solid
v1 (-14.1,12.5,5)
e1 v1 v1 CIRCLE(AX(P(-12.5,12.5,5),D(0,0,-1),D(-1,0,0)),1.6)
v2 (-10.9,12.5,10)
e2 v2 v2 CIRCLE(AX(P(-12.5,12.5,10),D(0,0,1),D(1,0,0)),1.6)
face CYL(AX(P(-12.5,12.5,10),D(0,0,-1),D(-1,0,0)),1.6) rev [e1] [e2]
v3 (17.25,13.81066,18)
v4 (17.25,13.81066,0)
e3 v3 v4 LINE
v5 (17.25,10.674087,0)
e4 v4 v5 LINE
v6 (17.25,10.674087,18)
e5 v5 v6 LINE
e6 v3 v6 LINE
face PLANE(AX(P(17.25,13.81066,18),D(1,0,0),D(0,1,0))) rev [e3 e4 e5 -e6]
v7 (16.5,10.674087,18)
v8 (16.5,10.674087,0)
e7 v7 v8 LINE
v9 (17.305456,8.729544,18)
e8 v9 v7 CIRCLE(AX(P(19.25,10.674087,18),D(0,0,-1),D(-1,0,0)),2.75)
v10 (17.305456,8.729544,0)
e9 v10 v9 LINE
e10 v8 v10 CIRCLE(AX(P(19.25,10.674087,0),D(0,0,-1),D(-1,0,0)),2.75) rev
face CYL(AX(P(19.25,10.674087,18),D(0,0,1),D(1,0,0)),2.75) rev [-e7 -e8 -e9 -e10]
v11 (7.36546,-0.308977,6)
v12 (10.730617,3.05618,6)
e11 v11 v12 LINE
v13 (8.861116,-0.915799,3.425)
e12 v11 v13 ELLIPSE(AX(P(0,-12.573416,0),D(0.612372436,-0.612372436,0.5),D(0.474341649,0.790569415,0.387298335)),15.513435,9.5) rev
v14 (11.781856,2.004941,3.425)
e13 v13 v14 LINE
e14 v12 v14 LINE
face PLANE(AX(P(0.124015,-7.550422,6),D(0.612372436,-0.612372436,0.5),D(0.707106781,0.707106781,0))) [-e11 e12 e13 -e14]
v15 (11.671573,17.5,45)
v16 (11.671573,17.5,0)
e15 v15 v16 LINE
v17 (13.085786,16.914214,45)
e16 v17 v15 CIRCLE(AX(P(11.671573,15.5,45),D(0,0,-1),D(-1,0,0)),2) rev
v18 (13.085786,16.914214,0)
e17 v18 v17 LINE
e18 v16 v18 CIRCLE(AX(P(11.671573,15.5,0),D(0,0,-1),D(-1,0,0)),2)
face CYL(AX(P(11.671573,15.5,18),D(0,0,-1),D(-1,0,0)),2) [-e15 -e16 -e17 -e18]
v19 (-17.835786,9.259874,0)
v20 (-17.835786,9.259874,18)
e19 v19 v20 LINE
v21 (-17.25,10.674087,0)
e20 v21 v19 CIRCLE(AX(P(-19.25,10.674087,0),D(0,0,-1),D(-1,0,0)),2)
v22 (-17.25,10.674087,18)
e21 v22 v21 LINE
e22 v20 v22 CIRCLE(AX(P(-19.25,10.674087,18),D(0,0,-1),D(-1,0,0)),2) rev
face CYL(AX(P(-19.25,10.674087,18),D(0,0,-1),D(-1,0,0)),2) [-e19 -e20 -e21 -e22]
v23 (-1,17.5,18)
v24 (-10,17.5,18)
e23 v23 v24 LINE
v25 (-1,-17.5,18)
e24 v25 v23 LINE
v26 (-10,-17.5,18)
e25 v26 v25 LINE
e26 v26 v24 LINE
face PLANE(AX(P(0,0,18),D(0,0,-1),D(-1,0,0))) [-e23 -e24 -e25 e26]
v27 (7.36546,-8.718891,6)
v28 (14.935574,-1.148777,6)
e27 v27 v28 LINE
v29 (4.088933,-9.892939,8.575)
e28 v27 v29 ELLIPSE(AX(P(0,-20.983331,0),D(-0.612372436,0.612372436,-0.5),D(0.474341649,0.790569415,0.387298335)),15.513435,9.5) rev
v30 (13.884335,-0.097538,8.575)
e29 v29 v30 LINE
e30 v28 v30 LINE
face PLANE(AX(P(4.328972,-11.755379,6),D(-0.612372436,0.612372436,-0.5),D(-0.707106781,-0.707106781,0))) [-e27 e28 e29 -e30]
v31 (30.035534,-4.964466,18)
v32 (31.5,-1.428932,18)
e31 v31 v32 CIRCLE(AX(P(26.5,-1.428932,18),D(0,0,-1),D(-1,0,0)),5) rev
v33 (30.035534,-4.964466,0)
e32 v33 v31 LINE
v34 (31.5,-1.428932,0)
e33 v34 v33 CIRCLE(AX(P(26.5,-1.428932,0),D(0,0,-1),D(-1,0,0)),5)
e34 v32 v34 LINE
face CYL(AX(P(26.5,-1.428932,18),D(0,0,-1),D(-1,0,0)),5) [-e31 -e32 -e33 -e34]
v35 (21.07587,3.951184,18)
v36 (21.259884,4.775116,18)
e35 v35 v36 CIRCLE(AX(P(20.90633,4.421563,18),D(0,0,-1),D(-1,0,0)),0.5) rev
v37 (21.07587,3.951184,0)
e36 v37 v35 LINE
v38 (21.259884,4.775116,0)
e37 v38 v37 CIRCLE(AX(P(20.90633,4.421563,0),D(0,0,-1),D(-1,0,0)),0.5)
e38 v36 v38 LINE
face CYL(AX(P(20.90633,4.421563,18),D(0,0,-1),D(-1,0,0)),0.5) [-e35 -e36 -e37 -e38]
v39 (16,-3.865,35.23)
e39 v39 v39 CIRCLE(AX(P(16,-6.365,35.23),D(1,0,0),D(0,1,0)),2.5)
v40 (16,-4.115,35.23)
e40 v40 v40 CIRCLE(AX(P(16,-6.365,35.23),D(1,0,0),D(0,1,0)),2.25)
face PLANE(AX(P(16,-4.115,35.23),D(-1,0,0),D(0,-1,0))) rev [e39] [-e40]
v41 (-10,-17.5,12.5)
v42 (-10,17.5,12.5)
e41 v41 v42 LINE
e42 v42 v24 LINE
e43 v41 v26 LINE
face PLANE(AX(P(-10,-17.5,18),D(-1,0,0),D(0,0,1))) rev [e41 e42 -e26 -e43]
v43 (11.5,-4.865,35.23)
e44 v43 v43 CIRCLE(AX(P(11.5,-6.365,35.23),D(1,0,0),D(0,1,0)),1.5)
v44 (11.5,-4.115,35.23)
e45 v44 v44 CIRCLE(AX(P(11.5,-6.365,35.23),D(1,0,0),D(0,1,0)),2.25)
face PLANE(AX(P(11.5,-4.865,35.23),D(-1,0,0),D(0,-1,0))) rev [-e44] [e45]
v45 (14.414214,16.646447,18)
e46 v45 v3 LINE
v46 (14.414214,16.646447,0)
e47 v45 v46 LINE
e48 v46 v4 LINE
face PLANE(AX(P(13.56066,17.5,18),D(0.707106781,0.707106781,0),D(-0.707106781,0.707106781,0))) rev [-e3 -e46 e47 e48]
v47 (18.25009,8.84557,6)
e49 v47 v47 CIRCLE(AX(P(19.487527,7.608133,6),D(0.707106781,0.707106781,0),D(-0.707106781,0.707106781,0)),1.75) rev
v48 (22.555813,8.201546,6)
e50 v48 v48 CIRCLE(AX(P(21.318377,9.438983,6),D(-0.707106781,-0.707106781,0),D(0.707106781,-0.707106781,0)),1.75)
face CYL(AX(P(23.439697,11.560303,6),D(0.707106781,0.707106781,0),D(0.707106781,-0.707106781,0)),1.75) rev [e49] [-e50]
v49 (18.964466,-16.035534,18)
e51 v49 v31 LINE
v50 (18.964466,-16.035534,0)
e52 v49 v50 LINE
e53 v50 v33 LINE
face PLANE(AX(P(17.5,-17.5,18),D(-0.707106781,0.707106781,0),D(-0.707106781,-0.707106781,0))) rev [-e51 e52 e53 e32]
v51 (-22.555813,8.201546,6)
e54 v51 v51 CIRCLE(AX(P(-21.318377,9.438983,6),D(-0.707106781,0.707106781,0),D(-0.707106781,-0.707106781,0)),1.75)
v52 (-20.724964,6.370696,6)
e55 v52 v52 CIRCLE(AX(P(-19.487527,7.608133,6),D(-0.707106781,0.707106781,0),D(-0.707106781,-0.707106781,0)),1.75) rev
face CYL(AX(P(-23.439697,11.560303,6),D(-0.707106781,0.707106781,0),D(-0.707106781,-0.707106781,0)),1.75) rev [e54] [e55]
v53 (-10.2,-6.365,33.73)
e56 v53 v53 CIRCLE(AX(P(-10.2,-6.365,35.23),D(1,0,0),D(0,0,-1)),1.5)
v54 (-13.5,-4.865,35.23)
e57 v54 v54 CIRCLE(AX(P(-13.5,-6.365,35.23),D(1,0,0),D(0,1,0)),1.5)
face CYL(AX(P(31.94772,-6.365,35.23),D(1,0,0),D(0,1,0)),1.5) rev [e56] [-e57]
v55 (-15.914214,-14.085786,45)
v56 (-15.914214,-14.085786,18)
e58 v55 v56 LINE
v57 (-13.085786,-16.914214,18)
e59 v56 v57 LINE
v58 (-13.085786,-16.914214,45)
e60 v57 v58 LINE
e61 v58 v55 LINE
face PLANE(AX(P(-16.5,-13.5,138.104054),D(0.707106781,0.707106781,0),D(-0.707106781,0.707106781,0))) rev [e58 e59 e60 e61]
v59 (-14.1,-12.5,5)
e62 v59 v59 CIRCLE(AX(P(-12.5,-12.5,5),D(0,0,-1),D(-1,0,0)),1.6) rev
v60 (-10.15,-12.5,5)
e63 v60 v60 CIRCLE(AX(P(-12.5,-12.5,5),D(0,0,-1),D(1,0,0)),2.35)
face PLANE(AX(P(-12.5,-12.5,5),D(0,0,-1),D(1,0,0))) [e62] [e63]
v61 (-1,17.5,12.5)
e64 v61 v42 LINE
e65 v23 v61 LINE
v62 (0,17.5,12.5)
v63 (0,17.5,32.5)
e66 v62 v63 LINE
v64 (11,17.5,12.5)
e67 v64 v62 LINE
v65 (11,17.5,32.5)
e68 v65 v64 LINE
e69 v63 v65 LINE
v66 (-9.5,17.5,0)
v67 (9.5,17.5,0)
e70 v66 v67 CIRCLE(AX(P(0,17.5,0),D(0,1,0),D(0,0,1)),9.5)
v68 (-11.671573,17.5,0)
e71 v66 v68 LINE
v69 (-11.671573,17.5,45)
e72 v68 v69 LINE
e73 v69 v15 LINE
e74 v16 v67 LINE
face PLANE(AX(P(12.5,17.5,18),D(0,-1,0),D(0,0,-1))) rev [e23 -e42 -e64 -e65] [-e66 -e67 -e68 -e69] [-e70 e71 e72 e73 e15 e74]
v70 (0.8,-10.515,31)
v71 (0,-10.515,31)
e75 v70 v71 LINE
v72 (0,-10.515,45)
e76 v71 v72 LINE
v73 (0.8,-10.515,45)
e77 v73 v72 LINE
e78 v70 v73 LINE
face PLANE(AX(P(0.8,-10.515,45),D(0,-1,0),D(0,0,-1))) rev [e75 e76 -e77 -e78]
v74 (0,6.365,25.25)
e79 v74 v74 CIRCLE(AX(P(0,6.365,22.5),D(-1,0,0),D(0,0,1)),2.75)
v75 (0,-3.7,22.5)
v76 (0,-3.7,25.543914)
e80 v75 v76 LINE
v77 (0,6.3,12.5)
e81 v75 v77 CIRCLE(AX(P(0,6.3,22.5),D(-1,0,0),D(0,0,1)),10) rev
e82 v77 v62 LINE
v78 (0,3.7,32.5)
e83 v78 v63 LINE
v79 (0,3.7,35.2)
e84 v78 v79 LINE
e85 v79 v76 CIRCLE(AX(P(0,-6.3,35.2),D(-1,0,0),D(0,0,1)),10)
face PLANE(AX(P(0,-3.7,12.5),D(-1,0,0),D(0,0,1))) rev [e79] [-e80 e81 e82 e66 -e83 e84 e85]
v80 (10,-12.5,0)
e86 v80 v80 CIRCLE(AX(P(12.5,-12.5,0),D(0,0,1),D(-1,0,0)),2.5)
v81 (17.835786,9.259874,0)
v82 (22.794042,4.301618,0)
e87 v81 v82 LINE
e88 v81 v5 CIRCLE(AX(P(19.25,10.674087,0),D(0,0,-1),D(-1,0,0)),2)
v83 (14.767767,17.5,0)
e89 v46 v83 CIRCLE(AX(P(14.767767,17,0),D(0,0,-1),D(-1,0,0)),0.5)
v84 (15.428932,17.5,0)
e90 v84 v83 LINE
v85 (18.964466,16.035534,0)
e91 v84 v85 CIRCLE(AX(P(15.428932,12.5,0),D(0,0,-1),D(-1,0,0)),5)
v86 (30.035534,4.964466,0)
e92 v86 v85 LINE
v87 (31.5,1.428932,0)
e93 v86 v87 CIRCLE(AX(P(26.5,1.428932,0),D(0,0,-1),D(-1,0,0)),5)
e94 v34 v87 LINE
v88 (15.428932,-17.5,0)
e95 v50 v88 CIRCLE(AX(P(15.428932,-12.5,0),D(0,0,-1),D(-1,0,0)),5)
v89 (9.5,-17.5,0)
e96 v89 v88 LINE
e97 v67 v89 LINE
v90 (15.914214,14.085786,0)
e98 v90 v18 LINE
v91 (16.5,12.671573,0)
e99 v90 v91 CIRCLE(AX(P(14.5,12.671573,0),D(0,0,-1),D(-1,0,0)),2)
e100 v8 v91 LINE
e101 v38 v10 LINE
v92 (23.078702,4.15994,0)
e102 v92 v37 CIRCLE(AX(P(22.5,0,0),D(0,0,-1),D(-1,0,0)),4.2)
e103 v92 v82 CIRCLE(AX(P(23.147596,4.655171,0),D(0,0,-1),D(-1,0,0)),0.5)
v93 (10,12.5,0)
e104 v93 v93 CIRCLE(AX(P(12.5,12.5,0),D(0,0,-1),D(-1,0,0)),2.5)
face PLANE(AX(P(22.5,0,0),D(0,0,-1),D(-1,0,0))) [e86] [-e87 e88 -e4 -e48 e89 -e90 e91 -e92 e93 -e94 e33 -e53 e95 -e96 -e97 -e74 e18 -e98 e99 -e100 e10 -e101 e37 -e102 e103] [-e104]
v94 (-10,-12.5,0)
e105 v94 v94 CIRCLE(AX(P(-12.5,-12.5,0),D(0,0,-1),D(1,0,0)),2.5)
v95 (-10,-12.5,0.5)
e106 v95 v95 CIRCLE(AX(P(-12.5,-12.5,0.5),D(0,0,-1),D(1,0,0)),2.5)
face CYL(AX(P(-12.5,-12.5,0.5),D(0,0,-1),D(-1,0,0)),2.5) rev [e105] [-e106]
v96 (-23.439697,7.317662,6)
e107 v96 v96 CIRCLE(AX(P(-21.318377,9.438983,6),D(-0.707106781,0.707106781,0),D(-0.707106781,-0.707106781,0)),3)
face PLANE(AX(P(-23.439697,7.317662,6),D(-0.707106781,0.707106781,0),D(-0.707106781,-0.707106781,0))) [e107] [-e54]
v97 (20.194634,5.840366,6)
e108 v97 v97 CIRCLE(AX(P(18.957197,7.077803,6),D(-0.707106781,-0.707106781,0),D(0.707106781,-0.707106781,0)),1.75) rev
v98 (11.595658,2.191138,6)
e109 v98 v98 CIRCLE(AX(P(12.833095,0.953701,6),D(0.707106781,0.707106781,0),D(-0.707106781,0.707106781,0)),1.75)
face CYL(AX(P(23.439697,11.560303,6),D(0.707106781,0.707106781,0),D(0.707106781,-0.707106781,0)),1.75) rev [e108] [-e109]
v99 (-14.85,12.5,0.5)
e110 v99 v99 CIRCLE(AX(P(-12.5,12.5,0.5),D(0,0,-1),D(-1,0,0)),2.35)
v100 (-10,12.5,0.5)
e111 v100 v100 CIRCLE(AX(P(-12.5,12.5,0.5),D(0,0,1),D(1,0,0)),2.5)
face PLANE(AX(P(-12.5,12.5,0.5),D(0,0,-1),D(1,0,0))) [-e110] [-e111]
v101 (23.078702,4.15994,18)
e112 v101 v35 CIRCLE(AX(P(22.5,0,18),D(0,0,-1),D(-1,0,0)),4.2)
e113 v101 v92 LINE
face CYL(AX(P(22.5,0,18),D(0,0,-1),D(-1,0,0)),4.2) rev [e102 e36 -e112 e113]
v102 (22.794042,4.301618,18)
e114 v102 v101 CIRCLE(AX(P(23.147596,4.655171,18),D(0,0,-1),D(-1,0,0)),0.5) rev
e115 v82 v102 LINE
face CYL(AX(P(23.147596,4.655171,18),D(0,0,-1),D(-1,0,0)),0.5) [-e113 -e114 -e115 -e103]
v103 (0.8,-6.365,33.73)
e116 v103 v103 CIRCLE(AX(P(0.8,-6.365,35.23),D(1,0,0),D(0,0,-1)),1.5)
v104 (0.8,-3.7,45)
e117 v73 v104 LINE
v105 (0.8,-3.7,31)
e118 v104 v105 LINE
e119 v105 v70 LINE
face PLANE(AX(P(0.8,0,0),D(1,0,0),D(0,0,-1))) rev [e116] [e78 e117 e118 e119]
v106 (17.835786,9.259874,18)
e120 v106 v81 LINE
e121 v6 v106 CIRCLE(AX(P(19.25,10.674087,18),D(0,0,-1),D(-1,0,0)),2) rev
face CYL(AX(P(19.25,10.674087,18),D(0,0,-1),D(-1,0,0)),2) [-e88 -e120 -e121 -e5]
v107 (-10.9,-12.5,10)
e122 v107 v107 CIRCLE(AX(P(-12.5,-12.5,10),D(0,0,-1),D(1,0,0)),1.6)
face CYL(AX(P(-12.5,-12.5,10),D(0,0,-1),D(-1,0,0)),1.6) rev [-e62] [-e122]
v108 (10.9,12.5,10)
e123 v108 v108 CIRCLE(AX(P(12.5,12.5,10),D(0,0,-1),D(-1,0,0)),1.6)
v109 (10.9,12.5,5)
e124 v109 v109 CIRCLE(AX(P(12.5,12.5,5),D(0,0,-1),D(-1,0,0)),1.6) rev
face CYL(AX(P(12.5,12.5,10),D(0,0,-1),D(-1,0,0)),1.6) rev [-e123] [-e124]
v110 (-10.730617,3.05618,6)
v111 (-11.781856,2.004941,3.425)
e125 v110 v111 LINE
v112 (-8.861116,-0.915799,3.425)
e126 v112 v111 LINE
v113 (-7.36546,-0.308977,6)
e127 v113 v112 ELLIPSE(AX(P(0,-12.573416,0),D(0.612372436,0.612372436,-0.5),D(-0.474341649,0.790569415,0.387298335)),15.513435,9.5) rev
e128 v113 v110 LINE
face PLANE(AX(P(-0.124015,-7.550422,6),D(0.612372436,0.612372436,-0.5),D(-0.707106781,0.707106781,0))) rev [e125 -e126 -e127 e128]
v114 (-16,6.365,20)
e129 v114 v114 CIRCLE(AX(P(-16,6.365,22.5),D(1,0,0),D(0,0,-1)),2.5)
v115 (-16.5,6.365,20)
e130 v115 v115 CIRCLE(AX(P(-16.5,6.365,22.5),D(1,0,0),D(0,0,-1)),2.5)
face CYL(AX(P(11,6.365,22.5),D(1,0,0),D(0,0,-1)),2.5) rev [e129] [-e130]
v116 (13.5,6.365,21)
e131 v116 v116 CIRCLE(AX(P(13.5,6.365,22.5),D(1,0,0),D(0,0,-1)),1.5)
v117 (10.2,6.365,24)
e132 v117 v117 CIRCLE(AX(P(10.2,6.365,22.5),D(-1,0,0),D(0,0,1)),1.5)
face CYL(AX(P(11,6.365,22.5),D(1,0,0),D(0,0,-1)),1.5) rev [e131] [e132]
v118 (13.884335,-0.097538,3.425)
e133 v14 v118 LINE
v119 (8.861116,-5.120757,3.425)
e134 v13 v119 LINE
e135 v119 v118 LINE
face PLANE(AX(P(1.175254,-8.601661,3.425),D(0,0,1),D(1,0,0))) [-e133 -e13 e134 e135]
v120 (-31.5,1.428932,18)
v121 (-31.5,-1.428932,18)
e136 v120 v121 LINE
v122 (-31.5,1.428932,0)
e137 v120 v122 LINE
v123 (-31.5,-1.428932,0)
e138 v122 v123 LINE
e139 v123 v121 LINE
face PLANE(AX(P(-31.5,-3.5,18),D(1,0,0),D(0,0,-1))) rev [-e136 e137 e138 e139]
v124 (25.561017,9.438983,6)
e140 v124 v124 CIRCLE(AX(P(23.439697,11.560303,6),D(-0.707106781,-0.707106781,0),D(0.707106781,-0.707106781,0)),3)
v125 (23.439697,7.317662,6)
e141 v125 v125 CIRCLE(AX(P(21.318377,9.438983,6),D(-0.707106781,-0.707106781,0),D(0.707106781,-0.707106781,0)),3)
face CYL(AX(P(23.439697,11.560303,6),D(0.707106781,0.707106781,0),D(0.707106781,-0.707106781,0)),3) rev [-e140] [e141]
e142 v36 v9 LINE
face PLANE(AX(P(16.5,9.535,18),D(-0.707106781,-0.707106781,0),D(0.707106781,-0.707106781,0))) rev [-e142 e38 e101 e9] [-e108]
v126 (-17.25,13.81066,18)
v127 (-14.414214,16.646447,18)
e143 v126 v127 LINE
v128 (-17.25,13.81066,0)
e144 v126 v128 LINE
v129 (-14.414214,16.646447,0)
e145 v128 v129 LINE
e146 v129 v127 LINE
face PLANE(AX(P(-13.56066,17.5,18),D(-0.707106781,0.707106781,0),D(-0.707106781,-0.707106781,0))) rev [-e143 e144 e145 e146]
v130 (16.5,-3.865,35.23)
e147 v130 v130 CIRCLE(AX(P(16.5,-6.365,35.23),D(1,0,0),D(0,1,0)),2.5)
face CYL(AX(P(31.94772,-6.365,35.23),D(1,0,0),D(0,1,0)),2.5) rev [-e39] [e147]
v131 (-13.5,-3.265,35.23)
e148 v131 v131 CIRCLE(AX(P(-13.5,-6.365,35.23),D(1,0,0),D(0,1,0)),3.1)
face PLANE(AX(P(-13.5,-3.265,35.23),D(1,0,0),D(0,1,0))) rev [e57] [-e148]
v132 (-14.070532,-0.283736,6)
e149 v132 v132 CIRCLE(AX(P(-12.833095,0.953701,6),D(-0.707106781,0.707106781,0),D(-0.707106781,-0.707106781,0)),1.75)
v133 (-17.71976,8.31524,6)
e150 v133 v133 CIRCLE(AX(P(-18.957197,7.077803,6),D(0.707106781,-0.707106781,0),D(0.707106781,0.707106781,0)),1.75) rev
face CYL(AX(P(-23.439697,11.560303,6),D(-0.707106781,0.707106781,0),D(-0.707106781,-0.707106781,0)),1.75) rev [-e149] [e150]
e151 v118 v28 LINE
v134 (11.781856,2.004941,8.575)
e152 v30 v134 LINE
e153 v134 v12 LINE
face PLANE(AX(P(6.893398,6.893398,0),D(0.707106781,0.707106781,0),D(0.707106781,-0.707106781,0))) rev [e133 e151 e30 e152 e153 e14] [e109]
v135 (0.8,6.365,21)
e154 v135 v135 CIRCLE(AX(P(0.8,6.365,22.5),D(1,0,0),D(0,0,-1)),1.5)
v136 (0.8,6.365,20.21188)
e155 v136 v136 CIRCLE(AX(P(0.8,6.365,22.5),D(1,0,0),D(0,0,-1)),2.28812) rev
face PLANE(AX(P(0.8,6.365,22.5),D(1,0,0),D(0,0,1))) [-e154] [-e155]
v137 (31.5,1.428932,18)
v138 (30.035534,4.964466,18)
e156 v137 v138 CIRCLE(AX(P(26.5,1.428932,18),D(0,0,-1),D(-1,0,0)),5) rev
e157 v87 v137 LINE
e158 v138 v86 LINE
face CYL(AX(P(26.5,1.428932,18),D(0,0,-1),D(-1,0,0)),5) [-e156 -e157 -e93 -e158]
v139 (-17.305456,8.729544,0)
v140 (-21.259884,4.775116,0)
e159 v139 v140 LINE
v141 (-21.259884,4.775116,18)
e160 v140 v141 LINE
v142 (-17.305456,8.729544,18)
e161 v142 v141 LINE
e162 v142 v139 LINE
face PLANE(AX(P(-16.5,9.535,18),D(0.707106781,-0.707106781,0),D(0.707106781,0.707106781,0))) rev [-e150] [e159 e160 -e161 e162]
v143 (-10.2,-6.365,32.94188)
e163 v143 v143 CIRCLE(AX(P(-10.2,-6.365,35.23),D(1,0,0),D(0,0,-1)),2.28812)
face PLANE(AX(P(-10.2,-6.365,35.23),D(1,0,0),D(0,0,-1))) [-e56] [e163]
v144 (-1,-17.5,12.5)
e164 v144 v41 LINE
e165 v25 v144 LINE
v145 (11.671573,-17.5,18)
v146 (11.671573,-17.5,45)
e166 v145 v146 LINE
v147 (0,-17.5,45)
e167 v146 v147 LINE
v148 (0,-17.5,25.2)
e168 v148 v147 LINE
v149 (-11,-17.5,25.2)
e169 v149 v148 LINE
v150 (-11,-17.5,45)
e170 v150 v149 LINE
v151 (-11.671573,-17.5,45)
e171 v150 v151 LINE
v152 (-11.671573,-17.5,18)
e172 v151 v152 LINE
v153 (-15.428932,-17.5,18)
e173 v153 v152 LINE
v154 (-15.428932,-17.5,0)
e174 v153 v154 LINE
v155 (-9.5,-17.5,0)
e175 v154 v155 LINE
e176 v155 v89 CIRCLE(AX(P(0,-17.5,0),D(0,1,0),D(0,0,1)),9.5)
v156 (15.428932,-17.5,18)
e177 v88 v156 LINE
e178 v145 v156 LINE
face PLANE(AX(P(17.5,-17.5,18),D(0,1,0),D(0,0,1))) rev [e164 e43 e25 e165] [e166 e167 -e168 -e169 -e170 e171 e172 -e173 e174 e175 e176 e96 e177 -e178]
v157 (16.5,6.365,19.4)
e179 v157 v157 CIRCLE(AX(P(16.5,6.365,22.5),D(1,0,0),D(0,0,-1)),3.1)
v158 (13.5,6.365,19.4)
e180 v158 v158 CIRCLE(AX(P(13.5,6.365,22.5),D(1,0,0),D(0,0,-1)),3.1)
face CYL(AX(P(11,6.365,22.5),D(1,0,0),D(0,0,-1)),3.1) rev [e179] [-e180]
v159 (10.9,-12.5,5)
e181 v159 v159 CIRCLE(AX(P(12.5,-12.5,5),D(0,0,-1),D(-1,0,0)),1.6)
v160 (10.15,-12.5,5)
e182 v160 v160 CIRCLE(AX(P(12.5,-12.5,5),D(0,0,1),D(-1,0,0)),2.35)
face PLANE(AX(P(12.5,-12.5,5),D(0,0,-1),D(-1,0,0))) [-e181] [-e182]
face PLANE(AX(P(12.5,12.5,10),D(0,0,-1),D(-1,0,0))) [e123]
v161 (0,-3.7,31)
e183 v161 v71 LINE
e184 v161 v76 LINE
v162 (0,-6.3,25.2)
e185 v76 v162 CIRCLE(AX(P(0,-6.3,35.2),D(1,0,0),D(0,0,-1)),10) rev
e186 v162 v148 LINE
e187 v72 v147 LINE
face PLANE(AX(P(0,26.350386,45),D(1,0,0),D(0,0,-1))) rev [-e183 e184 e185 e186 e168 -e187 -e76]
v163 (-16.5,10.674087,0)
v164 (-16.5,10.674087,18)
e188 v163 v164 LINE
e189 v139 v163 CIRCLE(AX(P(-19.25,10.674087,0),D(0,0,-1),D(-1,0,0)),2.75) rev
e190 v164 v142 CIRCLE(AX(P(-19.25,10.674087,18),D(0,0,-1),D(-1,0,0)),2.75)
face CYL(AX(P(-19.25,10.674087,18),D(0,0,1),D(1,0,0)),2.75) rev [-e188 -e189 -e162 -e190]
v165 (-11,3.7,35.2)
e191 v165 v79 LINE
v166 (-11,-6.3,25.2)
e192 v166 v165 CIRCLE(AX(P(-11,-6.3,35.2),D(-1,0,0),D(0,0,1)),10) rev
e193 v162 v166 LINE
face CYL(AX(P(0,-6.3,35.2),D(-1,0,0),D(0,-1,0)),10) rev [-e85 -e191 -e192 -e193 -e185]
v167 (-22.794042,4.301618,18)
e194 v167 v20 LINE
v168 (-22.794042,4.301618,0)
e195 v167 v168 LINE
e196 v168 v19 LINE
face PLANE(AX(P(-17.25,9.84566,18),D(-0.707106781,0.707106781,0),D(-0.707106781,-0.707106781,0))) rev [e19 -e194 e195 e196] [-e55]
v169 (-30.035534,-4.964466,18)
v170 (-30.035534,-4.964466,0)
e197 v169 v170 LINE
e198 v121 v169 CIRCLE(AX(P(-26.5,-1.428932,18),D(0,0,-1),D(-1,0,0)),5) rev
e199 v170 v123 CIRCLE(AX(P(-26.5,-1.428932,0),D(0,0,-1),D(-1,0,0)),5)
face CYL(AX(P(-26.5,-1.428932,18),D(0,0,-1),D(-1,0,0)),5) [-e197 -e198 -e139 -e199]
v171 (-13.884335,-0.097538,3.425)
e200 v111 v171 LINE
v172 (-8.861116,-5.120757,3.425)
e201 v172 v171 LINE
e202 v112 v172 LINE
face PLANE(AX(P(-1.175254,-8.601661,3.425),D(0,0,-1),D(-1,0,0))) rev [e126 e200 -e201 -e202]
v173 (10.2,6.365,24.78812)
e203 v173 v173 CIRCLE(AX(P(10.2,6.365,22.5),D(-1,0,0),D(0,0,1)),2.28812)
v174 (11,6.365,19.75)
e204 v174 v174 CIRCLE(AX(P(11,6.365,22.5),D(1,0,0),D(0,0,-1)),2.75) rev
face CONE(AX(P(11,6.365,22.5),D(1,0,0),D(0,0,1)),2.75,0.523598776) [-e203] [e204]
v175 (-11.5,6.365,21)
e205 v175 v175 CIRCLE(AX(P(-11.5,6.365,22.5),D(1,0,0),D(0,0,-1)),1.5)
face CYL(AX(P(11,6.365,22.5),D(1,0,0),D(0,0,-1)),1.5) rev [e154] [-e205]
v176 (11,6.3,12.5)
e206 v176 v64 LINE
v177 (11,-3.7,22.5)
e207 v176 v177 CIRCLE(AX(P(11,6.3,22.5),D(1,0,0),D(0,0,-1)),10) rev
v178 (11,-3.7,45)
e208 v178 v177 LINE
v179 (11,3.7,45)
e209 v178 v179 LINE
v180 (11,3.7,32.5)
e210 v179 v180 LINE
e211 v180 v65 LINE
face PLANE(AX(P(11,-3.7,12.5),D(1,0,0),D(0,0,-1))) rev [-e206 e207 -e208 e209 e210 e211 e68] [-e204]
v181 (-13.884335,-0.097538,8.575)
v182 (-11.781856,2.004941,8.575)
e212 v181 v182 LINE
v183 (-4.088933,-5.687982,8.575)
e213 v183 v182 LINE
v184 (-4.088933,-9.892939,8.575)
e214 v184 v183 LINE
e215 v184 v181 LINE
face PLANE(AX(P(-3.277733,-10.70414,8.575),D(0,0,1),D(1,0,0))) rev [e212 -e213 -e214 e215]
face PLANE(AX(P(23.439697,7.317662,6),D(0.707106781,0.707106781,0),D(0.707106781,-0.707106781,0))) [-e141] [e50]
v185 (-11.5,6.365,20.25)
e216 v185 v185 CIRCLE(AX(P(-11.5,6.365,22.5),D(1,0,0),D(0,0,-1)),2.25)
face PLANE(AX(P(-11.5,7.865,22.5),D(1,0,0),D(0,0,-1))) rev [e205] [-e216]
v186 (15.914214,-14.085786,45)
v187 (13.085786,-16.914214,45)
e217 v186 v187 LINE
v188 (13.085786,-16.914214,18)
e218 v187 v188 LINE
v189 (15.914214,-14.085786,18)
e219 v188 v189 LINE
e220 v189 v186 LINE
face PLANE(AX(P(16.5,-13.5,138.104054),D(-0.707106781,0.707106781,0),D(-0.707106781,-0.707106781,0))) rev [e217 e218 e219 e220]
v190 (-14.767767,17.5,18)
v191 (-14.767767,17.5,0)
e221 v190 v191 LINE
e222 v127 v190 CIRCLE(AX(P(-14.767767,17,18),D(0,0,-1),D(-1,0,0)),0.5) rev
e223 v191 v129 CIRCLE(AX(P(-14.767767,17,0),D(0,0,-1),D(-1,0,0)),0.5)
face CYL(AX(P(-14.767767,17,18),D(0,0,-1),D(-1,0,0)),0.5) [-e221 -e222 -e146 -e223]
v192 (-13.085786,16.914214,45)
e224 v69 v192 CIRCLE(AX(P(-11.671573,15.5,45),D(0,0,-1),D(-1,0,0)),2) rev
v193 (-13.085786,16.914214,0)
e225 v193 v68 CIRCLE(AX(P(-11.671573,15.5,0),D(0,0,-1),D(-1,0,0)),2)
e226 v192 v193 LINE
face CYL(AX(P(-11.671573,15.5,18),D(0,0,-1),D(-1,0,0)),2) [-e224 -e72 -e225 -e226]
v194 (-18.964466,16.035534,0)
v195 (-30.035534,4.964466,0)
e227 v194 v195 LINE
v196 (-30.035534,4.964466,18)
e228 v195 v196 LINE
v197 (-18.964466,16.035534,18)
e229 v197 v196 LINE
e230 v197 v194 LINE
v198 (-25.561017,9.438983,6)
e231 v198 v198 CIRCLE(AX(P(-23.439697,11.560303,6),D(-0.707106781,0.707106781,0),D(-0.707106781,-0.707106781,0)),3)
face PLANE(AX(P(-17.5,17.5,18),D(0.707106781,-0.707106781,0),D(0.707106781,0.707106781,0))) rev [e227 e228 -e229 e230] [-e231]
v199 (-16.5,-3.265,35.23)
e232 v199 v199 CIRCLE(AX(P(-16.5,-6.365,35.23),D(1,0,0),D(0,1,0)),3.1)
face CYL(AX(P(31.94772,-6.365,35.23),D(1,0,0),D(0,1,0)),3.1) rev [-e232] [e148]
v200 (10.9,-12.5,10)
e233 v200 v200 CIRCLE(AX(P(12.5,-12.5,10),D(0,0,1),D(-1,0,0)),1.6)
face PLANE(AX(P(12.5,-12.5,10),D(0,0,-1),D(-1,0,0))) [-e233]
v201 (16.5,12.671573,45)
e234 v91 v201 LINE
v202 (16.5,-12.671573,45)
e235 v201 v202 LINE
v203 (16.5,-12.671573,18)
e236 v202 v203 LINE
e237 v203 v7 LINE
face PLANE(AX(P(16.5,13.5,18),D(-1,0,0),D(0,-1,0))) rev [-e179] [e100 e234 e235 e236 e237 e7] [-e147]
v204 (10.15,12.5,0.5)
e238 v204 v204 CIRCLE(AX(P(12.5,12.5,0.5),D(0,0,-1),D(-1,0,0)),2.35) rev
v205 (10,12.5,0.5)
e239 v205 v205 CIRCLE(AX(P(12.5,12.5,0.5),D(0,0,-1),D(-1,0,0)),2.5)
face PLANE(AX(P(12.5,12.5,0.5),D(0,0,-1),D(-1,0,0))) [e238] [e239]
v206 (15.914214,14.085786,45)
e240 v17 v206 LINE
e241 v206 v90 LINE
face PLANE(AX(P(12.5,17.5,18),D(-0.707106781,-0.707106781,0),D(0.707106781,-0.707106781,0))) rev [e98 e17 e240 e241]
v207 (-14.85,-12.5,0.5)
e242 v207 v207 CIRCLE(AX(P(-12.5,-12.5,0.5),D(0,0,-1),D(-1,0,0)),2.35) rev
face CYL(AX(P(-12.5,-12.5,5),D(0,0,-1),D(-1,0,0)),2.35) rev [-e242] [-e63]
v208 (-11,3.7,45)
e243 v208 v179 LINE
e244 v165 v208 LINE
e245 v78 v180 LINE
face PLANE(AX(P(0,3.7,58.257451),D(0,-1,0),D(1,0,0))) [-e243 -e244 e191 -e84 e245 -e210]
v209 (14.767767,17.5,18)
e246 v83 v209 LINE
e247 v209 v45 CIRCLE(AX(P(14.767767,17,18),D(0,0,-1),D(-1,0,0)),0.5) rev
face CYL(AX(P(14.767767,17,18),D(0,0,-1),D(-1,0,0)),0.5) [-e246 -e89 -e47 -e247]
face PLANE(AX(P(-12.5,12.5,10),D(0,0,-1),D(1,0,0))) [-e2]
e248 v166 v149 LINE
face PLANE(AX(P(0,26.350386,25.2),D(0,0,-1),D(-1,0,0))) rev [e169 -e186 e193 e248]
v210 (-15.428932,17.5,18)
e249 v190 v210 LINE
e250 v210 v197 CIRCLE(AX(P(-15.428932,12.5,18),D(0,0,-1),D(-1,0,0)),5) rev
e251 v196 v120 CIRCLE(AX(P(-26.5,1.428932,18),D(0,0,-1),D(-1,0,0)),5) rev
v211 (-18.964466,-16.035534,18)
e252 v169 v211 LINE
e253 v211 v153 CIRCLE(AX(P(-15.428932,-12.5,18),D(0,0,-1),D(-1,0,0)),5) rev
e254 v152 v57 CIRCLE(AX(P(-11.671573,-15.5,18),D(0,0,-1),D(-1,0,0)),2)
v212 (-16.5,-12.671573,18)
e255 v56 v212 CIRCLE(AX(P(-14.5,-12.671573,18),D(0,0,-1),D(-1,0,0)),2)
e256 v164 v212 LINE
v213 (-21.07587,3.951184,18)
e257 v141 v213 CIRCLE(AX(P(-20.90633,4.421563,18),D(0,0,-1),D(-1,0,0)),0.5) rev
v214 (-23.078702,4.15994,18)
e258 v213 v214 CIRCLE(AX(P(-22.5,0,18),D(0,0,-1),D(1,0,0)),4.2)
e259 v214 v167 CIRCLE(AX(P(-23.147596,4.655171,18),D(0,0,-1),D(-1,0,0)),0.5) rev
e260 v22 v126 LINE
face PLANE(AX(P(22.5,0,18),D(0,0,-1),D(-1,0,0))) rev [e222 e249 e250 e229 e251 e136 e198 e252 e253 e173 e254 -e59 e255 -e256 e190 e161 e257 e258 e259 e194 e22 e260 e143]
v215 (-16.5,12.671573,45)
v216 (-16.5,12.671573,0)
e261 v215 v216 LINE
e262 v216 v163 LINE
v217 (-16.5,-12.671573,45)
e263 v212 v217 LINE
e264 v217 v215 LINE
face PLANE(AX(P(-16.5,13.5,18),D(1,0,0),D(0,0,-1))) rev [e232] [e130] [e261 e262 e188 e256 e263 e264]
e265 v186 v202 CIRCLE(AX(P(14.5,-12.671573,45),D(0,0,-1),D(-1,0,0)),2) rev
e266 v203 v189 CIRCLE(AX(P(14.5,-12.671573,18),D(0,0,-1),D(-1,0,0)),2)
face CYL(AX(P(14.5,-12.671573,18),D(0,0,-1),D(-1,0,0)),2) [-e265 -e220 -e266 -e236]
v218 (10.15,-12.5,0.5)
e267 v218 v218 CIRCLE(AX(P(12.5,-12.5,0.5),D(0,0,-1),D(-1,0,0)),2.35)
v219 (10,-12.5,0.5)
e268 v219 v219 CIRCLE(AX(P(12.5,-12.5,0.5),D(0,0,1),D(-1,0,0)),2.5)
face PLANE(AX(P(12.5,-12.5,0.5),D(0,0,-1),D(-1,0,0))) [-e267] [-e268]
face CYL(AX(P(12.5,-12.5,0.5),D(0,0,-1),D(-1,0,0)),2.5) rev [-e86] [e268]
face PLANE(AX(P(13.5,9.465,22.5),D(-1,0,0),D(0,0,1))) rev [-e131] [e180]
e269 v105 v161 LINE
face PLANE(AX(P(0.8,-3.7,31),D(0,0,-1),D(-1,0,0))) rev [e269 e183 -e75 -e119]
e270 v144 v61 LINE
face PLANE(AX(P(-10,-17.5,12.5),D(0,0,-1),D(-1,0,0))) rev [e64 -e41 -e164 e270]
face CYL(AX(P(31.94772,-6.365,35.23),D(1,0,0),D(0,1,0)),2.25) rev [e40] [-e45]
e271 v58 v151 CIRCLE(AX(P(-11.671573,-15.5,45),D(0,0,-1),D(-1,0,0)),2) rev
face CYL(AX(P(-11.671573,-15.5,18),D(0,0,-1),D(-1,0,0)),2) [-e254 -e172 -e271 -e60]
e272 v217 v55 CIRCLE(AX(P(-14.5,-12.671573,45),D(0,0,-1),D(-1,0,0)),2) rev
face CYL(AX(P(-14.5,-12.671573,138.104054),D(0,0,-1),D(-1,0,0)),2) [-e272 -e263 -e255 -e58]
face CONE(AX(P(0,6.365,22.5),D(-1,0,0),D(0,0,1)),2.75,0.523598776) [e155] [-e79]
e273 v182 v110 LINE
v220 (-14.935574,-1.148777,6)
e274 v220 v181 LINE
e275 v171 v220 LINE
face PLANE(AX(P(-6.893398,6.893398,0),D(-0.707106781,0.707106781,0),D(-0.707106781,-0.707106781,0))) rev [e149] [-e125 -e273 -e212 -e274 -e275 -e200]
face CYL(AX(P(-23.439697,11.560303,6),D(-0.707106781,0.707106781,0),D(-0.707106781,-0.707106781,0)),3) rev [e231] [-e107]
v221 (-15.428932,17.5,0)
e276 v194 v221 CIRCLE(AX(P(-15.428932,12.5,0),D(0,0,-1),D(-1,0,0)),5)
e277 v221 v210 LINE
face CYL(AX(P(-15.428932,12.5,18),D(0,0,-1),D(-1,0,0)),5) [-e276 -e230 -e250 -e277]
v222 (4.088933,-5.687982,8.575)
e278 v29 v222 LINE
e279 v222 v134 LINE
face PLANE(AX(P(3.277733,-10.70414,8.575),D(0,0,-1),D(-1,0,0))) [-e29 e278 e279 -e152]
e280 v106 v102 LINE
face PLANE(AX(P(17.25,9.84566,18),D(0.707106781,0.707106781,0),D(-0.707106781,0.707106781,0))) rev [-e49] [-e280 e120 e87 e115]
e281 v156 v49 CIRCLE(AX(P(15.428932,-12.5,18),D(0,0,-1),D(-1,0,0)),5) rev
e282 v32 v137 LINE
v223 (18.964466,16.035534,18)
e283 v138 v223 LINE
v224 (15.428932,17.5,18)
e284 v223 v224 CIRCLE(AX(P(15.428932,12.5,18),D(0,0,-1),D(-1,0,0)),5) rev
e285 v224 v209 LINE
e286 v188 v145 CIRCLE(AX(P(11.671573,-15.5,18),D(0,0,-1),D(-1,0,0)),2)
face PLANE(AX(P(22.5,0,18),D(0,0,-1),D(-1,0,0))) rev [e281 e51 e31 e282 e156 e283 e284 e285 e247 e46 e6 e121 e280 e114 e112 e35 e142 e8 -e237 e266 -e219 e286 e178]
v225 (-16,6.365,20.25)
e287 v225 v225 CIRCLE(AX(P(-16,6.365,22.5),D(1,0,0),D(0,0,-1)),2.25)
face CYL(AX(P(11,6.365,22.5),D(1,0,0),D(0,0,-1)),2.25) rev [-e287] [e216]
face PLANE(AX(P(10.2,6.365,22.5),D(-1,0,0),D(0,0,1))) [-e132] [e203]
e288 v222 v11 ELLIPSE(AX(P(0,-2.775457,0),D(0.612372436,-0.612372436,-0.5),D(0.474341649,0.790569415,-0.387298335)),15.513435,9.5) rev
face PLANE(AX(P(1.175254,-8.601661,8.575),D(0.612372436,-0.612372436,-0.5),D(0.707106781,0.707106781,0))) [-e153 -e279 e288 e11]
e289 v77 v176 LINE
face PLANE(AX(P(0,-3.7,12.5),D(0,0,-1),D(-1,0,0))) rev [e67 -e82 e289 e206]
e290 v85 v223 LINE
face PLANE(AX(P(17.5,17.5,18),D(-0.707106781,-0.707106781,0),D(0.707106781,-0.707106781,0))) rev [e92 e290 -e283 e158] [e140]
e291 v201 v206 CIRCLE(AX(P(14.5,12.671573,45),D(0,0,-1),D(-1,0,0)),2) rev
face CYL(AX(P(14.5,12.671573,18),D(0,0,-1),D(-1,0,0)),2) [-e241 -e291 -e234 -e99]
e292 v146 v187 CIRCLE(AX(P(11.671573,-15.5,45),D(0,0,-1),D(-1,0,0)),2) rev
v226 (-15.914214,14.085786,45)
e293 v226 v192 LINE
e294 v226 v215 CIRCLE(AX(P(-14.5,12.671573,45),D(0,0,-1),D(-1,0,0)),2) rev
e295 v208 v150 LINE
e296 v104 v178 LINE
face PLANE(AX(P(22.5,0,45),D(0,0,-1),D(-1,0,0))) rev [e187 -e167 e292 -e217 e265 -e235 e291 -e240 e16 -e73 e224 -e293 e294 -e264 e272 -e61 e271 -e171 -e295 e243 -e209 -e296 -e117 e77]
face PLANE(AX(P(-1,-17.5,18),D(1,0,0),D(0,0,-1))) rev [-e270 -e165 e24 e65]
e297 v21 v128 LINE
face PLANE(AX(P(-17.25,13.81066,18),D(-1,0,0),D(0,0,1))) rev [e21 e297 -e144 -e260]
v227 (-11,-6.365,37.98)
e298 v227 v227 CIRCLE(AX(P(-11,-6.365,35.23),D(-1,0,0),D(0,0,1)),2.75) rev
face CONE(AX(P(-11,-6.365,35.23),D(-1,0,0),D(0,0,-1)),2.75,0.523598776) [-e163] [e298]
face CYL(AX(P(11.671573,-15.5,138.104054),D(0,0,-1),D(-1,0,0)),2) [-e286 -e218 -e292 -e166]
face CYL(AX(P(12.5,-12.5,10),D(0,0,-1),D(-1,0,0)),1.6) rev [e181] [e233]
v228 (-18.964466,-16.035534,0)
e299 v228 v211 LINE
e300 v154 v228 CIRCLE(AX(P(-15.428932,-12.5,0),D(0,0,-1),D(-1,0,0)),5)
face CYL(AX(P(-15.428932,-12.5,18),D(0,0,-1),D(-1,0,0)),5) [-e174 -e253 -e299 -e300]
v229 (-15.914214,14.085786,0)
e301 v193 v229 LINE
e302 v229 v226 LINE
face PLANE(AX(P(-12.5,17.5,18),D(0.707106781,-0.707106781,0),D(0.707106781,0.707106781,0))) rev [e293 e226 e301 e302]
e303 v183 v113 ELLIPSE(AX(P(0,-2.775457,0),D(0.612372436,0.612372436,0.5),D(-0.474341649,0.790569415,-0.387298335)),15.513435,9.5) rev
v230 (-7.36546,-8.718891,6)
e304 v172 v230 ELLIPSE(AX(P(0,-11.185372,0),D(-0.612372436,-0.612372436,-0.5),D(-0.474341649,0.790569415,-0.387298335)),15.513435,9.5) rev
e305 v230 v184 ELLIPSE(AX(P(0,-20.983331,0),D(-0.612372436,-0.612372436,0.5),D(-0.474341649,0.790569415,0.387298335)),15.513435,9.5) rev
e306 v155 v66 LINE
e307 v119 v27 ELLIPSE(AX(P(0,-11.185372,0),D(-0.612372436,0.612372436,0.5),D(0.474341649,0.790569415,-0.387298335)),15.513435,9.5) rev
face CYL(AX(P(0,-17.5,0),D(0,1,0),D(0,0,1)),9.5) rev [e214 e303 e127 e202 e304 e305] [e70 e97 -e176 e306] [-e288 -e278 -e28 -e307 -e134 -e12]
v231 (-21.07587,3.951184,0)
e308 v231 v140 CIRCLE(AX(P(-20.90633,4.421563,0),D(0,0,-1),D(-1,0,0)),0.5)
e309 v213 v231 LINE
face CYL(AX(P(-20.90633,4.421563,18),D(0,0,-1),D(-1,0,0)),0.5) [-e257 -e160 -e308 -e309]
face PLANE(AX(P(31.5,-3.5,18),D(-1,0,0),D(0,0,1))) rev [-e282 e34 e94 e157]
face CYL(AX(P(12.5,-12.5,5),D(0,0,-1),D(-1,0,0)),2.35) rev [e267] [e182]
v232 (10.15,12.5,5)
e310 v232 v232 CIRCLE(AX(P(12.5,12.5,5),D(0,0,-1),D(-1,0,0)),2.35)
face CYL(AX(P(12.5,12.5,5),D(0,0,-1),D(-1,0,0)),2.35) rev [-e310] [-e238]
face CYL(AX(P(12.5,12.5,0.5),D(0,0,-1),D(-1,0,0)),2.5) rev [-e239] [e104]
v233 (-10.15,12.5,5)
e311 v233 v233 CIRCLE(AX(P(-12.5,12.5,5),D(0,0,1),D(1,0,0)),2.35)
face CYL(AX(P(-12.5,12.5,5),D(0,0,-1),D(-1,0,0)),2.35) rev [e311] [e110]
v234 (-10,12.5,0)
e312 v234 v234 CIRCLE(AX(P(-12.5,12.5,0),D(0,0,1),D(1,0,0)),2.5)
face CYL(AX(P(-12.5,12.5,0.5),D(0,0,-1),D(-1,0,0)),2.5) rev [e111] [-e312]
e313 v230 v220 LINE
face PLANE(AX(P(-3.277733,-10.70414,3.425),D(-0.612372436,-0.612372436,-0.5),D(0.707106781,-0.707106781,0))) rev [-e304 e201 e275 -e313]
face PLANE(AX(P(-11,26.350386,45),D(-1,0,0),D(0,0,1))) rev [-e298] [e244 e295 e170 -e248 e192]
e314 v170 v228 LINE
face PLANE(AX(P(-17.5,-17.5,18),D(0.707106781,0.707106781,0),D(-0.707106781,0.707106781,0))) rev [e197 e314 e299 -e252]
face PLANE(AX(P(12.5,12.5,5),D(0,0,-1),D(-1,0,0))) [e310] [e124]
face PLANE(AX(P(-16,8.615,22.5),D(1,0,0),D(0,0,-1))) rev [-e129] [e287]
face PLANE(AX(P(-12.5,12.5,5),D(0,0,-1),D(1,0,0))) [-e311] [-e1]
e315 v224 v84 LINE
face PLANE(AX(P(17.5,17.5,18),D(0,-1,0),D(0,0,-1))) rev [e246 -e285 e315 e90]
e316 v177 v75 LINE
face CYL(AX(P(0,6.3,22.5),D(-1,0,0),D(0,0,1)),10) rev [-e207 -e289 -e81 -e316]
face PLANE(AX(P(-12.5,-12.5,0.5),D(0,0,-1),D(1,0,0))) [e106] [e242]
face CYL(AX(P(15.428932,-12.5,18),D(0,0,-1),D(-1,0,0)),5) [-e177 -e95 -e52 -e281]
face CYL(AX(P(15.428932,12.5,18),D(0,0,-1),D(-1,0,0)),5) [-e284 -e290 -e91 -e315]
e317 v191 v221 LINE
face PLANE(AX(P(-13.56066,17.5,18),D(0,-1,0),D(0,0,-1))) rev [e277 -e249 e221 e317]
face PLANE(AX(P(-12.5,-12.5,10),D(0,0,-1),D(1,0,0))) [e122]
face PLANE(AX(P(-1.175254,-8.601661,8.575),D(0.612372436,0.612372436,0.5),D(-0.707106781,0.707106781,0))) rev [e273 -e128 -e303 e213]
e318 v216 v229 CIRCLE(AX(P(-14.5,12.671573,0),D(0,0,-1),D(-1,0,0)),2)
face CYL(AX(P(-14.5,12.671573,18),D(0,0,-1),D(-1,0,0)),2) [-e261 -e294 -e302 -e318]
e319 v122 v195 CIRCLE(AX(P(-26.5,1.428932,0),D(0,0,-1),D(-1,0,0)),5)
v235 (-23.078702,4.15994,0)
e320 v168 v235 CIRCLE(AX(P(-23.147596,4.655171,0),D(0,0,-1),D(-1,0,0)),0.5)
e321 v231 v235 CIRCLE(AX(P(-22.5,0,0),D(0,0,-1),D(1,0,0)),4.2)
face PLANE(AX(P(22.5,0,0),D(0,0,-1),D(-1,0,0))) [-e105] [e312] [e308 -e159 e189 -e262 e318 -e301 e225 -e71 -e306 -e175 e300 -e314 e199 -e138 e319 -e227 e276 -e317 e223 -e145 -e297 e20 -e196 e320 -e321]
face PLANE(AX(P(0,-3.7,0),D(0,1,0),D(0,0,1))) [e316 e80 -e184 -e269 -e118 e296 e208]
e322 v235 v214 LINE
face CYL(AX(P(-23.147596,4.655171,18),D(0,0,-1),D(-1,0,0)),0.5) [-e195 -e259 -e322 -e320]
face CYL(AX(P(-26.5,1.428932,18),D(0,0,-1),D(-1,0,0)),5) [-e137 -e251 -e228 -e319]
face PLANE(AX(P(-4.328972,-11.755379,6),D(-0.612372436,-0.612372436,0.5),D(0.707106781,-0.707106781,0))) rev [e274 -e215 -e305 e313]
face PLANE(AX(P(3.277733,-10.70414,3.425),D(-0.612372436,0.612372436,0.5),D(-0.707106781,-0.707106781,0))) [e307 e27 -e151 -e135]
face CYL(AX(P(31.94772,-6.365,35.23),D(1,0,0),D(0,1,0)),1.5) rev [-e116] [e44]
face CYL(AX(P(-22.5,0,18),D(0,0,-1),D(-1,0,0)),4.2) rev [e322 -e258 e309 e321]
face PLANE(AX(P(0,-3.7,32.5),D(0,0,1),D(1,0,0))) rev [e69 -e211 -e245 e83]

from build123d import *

# Parameters (mm, degrees)
BOSS_EXTRUDE1_DEPTH     = 18
SKETCH2_R               = 9.5
SKETCH2_W               = 9
SKETCH2_H               = 5.5
CUT_EXTRUDE1_DEPTH      = 51.410812332
FILLET1_R               = 5
FILLET2_R               = 0.5
FILLET3_R               = 2
FILLET4_R               = 2.75
CUT_EXTRUDE2_DEPTH      = 15
SKETCH7_R               = 1.6
CUT_EXTRUDE3_DEPTH      = 10
SKETCH8_R               = 2.35
CUT_EXTRUDE4_DEPTH      = 5
SKETCH9_R               = 2.5
CUT_EXTRUDE5_DEPTH      = 0.5
MIRROR3_COPY_1_SKETCH_R = 1.6
MIRROR3_COPY_1_DEPTH    = 10
MIRROR3_COPY_2_SKETCH_R = 2.35
MIRROR3_COPY_2_DEPTH    = 5
MIRROR3_COPY_3_SKETCH_R = 2.5
MIRROR3_COPY_3_DEPTH    = 0.5
BOSS_EXTRUDE2_DEPTH     = 27
SKETCH11_W              = 11
SKETCH11_H              = 20
CUT_EXTRUDE6_DEPTH      = 21.2
SKETCH12_W              = 11
SKETCH12_H              = 3.7
CUT_EXTRUDE7_DEPTH      = 12.5
FILLET5_R               = 10
CUT_EXTRUDE8_REACH      = 67.133
SKETCH13_W              = 11
SKETCH13_H              = 19.8
FILLET6_R               = 10
SKETCH14_W              = 11
SKETCH14_H              = 7.4
CUT_EXTRUDE9_DEPTH      = 12.5
SKETCH15_R              = 2.75
BOSS_EXTRUDE3_DEPTH     = 0.8
BOSS_EXTRUDE3_TAPER     = 30
SKETCH16_W              = 14
SKETCH16_H              = 6.815
CUT_EXTRUDE10_DEPTH     = 0.8
SKETCH19_R              = 2.75
BOSS_EXTRUDE4_DEPTH     = 0.8
BOSS_EXTRUDE4_TAPER     = 30
FILLET7_R               = 2


with BuildPart() as part:
    # Sketch1 → Boss-Extrude1 (new body)
    with BuildSketch(Plane.XY):
        with BuildLine():
            Line((-17.5, 17.5), (-31.5, 3.5))
            Line((-31.5, 3.5), (-31.5, -3.5))
            Line((-31.5, -3.5), (-17.5, -17.5))
            Line((-17.5, -17.5), (17.5, -17.5))
            Line((17.5, -17.5), (31.5, -3.5))
            Line((31.5, -3.5), (31.5, 3.5))
            Line((31.5, 3.5), (17.5, 17.5))
            Line((17.5, 17.5), (13.560660172, 17.5))
            Line((13.560660172, 17.5), (17.25, 13.810660172))
            Line((17.25, 13.810660172), (17.25, 9.845660172))
            Line((17.25, 9.845660172), (22.916347453, 4.179312718))
            ThreePointArc((22.916347453, 4.179312718), (22.602164744, -4.198757241), (21.880882362, 4.154117638))
            Line((21.880882362, 4.154117638), (16.5, 9.535))
            Line((16.5, 9.535), (16.5, 13.5))
            Line((16.5, 13.5), (12.5, 17.5))
            Line((12.5, 17.5), (-12.5, 17.5))
            Line((-12.5, 17.5), (-16.5, 13.5))
            Line((-16.5, 13.5), (-16.5, 9.535))
            Line((-16.5, 9.535), (-21.880882362, 4.154117638))
            ThreePointArc((-21.880882362, 4.154117638), (-22.602164744, -4.198757241), (-22.916347453, 4.179312718))
            Line((-22.916347453, 4.179312718), (-17.25, 9.845660172))
            Line((-17.25, 9.845660172), (-17.25, 13.810660172))
            Line((-17.25, 13.810660172), (-13.560660172, 17.5))
            Line((-13.560660172, 17.5), (-17.5, 17.5))
        make_face()
    extrude(amount=BOSS_EXTRUDE1_DEPTH)

    # Sketch2 → Cut-Extrude1 (cut, through all)
    with BuildSketch(Plane(origin=(0, 17.5, 0), x_dir=(1, 0, 0), z_dir=(0, 1, 0))):
        Circle(SKETCH2_R)
        with Locations((-5.5, -15.25)):
            Rectangle(SKETCH2_W, SKETCH2_H)
    extrude(amount=-CUT_EXTRUDE1_DEPTH, mode=Mode.SUBTRACT)

    # Fillet1
    fillet1_edges = [part.edges().sort_by_distance(p)[0] for p in [
        (17.5, 17.5, 9),
        (31.5, 3.5, 9),
        (31.5, -3.5, 9),
        (17.5, -17.5, 9),
        (-17.5, -17.5, 9),
        (-31.5, -3.5, 9),
        (-31.5, 3.5, 9),
        (-17.5, 17.5, 9),
    ]]
    fillet(fillet1_edges, radius=FILLET1_R)

    # Fillet2
    fillet2_edges = [part.edges().sort_by_distance(p)[0] for p in [
        (-13.560660172, 17.5, 9),
        (-22.916347453, 4.179312718, 9),
        (-21.880882362, 4.154117638, 9),
        (21.880882362, 4.154117638, 9),
        (22.916347453, 4.179312718, 9),
        (13.560660172, 17.5, 9),
    ]]
    fillet(fillet2_edges, radius=FILLET2_R)

    # Fillet3
    fillet3_edges = [part.edges().sort_by_distance(p)[0] for p in [
        (-17.25, 9.845660172, 9),
        (17.25, 9.845660172, 9),
    ]]
    fillet(fillet3_edges, radius=FILLET3_R)

    # Fillet4
    fillet4_edges = [part.edges().sort_by_distance(p)[0] for p in [
        (-16.5, 9.535, 9),
        (16.5, 9.535, 9),
    ]]
    fillet(fillet4_edges, radius=FILLET4_R)

    # Sketch4 → Cut-Revolve1 (revolve, cut)
    with BuildSketch(Plane(origin=(0, 0, 6), x_dir=(-1, 0, 0), z_dir=(0, 0, -1))):
        Polygon((23.439696962, 11.560303038), (25.561017306, 9.438982694), (23.439696962, 7.317662351), (22.555813485, 8.201545827), (14.070532111, -0.283735547), (12.833095244, 0.95370132), align=None)
    cut_revolve1 = revolve(axis=Axis((-23.439696962, 11.560303038, 6), (0.7071067811865471, -0.707106781186548, 0)), mode=Mode.SUBTRACT)

    # Sketch6 → Cut-Extrude2 (cut)
    with BuildSketch(Plane(origin=(-6.893398282, 6.893398282, 0), x_dir=(0, 0, 1), z_dir=(-0.7071067811865471, 0.707106781186548, 0))):
        Polygon((3.425, -9.886676943), (6, -11.373353886), (8.575, -9.886676943), (8.575, -6.913323057), (6, -5.426646114), (3.425, -6.913323057), align=None)
    cut_extrude2 = extrude(amount=-CUT_EXTRUDE2_DEPTH, mode=Mode.SUBTRACT)

    # Mirror1: Cut-Revolve1, Cut-Extrude2 across plane
    add(cut_revolve1.mirror(Plane(origin=(0, 0, 0), x_dir=(0, 0, 1), z_dir=(1, 0, 0))), mode=Mode.SUBTRACT)
    add(cut_extrude2.mirror(Plane(origin=(0, 0, 0), x_dir=(0, 0, 1), z_dir=(1, 0, 0))), mode=Mode.SUBTRACT)

    # Sketch7 → Cut-Extrude3 (cut)
    with BuildSketch(Plane(origin=(0, 0, 0), x_dir=(-1, 0, 0), z_dir=(0, 0, -1))):
        with Locations((-12.5, 12.5)):
            Circle(SKETCH7_R)
    cut_extrude3 = extrude(amount=-CUT_EXTRUDE3_DEPTH, mode=Mode.SUBTRACT)

    # Sketch8 → Cut-Extrude4 (cut)
    with BuildSketch(Plane(origin=(0, 0, 0), x_dir=(-1, 0, 0), z_dir=(0, 0, -1))):
        with Locations((-12.5, 12.5)):
            Circle(SKETCH8_R)
    cut_extrude4 = extrude(amount=-CUT_EXTRUDE4_DEPTH, mode=Mode.SUBTRACT)

    # Sketch9 → Cut-Extrude5 (cut)
    with BuildSketch(Plane(origin=(0, 0, 0), x_dir=(-1, 0, 0), z_dir=(0, 0, -1))):
        with Locations((-12.5, 12.5)):
            Circle(SKETCH9_R)
    cut_extrude5 = extrude(amount=-CUT_EXTRUDE5_DEPTH, mode=Mode.SUBTRACT)

    # Mirror2: Cut-Extrude3, Cut-Extrude4, Cut-Extrude5 across plane
    add(cut_extrude3.mirror(Plane.ZX), mode=Mode.SUBTRACT)
    add(cut_extrude4.mirror(Plane.ZX), mode=Mode.SUBTRACT)
    add(cut_extrude5.mirror(Plane.ZX), mode=Mode.SUBTRACT)

    # Mirror3: Cut-Extrude3, Cut-Extrude4, Cut-Extrude5 across plane
    add(cut_extrude3.mirror(Plane(origin=(0, 0, 0), x_dir=(0, 0, 1), z_dir=(1, 0, 0))), mode=Mode.SUBTRACT)
    add(cut_extrude4.mirror(Plane(origin=(0, 0, 0), x_dir=(0, 0, 1), z_dir=(1, 0, 0))), mode=Mode.SUBTRACT)
    add(cut_extrude5.mirror(Plane(origin=(0, 0, 0), x_dir=(0, 0, 1), z_dir=(1, 0, 0))), mode=Mode.SUBTRACT)

    # Mirror3 copy 1 sketch → Mirror3 copy 1 (cut)
    with BuildSketch(Plane(origin=(0, 0, 0), x_dir=(1, 0, 0), z_dir=(0, 0, -1))):
        with Locations((-12.5, 12.5)):
            Circle(MIRROR3_COPY_1_SKETCH_R)
    extrude(amount=-MIRROR3_COPY_1_DEPTH, mode=Mode.SUBTRACT)

    # Mirror3 copy 2 sketch → Mirror3 copy 2 (cut)
    with BuildSketch(Plane(origin=(0, 0, 0), x_dir=(1, 0, 0), z_dir=(0, 0, -1))):
        with Locations((-12.5, 12.5)):
            Circle(MIRROR3_COPY_2_SKETCH_R)
    extrude(amount=-MIRROR3_COPY_2_DEPTH, mode=Mode.SUBTRACT)

    # Mirror3 copy 3 sketch → Mirror3 copy 3 (cut)
    with BuildSketch(Plane(origin=(0, 0, 0), x_dir=(1, 0, 0), z_dir=(0, 0, -1))):
        with Locations((-12.5, 12.5)):
            Circle(MIRROR3_COPY_3_SKETCH_R)
    extrude(amount=-MIRROR3_COPY_3_DEPTH, mode=Mode.SUBTRACT)

    # Sketch10 → Boss-Extrude2 (add)
    with BuildSketch(Plane.XY.offset(18)):
        Polygon((12.5, 17.5), (-12.5, 17.5), (-16.5, 13.5), (-16.5, -13.5), (-12.5, -17.5), (12.5, -17.5), (16.5, -13.5), (16.5, 13.5), align=None)
    extrude(amount=BOSS_EXTRUDE2_DEPTH)

    # Sketch11 → Cut-Extrude6 (cut)
    with BuildSketch(Plane(origin=(0, 17.5, 0), x_dir=(1, 0, 0), z_dir=(0, 1, 0))):
        with Locations((5.5, -22.5)):
            Rectangle(SKETCH11_W, SKETCH11_H)
    extrude(amount=-CUT_EXTRUDE6_DEPTH, mode=Mode.SUBTRACT)

    # Sketch12 → Cut-Extrude7 (cut)
    with BuildSketch(Plane(origin=(0, 0, 32.5), x_dir=(-1, 0, 0), z_dir=(0, 0, -1))):
        with Locations((-5.5, 1.85)):
            Rectangle(SKETCH12_W, SKETCH12_H)
        Polygon((-11, -3.7), (0, -3.7), (0, -3.591245546), (0, 0), (-11, 0), align=None)
    extrude(amount=-CUT_EXTRUDE7_DEPTH, mode=Mode.SUBTRACT)

    # Fillet5
    fillet5_edges = [part.edges().sort_by_distance(p)[0] for p in [
        (5.5, -3.7, 12.5),
    ]]
    fillet(fillet5_edges, radius=FILLET5_R)

    # Cut-Extrude8: up to this face of the body (flat: up to its plane)
    cut_extrude8_end = Plane(part.part.faces().sort_by_distance((5.5, 3.7, 38.75))[0])
    # Sketch13 → Cut-Extrude8 (cut, up to the picked face)
    with BuildSketch(Plane.XZ.offset(17.5), mode=Mode.PRIVATE) as cut_extrude8_sk1:
        with Locations((-5.5, 35.1)):
            Rectangle(SKETCH13_W, SKETCH13_H)
    cut_extrude8_tool1 = split(extrude(cut_extrude8_sk1.sketch, amount=-CUT_EXTRUDE8_REACH, mode=Mode.PRIVATE), bisect_by=cut_extrude8_end, keep=Keep.BOTH, mode=Mode.PRIVATE)
    add(cut_extrude8_tool1.solids().sort_by(Axis((-5.5, -17.5, 35.1), (0, 1, 0)))[0], mode=Mode.SUBTRACT)

    # Fillet6
    # the kernel refuses this fillet: 10 mm, written as the material it adds along each edge
    with BuildSketch(Plane(origin=(25, 3.7, 25.2), x_dir=(0, 0, 1), z_dir=(-1, 0, 0))) as fillet6_piece_1_section:
        with BuildLine():
            CenterArc((FILLET6_R, -FILLET6_R), FILLET6_R, 90, 90)
            Line((0, -FILLET6_R), (0, 0))
            Line((0, 0), (FILLET6_R, 0))
        make_face()
    fillet6_piece_1 = extrude(amount=36, mode=Mode.PRIVATE)
    fillet6_piece_1 = split(fillet6_piece_1, bisect_by=Plane(origin=(5.5, 3.588944861, 32.5), z_dir=(0, 0, 1)), keep=Keep.TOP, mode=Mode.PRIVATE)
    fillet6_piece_1 = split(fillet6_piece_1, bisect_by=Plane(origin=(11, 3.588944861, 33.172467691), z_dir=(-1, 0, 0)), keep=Keep.TOP, mode=Mode.PRIVATE)
    add(fillet6_piece_1)
    with BuildSketch(Plane(origin=(0, 3.7, 25.2), x_dir=(0, 0, 1), z_dir=(-1, 0, 0))) as fillet6_piece_2:
        with BuildLine():
            CenterArc((FILLET6_R, -FILLET6_R), FILLET6_R, 90, 90)
            Line((0, -FILLET6_R), (0, 0))
            Line((0, 0), (FILLET6_R, 0))
        make_face()
    extrude(amount=11)

    # Sketch14 → Cut-Extrude9 (cut)
    with BuildSketch(Plane.XY.offset(45)):
        with Locations((5.5, 0)):
            Rectangle(SKETCH14_W, SKETCH14_H)
    extrude(amount=-CUT_EXTRUDE9_DEPTH, mode=Mode.SUBTRACT)

    # Sketch15 → Boss-Extrude3 (add)
    with BuildSketch(Plane(origin=(-11, 0, 0), x_dir=(0, 0, -1), z_dir=(1, 0, 0))):
        with Locations((-35.23, -6.365)):
            Circle(SKETCH15_R)
    extrude(amount=BOSS_EXTRUDE3_DEPTH, taper=BOSS_EXTRUDE3_TAPER)

    # Sketch16 → Cut-Extrude10 (cut)
    with BuildSketch(Plane.ZY):
        with Locations((38, -7.1075)):
            Rectangle(SKETCH16_W, SKETCH16_H)
    extrude(amount=-CUT_EXTRUDE10_DEPTH, mode=Mode.SUBTRACT)

    # Sketch17 → Cut-Revolve2 (revolve, cut)
    with BuildSketch(Plane.XY.offset(35.23)):
        Polygon((-16.5, -6.365), (-16.5, -3.265), (-13.5, -3.265), (-13.5, -4.865), (11.5, -4.865), (11.5, -4.115), (16, -4.115), (16, -3.865), (16.5, -3.865), (16.5, -6.365), align=None)
    revolve(axis=Axis((31.947720378, -6.365, 35.23), (-1, 0, 0)), mode=Mode.SUBTRACT)

    # Sketch19 → Boss-Extrude4 (add)
    with BuildSketch(Plane.ZY.offset(-11)):
        with Locations((22.5, 6.365)):
            Circle(SKETCH19_R)
    boss_extrude4 = extrude(amount=BOSS_EXTRUDE4_DEPTH, taper=BOSS_EXTRUDE4_TAPER)

    # Mirror4: Boss-Extrude4 across plane
    add(boss_extrude4.mirror(Plane(origin=(5.5, 0, 0), x_dir=(0, 0, 1), z_dir=(1, 0, 0))))

    # Sketch20 → Cut-Revolve3 (revolve, cut)
    with BuildSketch(Plane.XY.offset(22.5), mode=Mode.PRIVATE) as cut_revolve3_sk:
        Polygon((16.5, 6.365), (16.5, 9.465), (13.5, 9.465), (13.5, 7.865), (-11.5, 7.865), (-11.5, 8.615), (-16, 8.615), (-16, 8.865), (-16.5, 8.865), (-16.5, 6.365), align=None)
    revolve(cut_revolve3_sk.sketch.rotate(Axis((11, 6.365, 22.5), (-1, 0, 0)), 90), axis=Axis((11, 6.365, 22.5), (-1, 0, 0)), mode=Mode.SUBTRACT)

    # Fillet7
    fillet7_edges = [part.edges().sort_by_distance(p)[0] for p in [
        (16.5, -13.5, 31.5),
        (12.5, -17.5, 31.5),
        (-12.5, -17.5, 31.5),
        (-16.5, -13.5, 31.5),
        (-16.5, 13.5, 22.5),
        (-12.5, 17.5, 22.5),
        (12.5, 17.5, 22.5),
        (16.5, 13.5, 22.5),
    ]]
    fillet(fillet7_edges, radius=FILLET7_R)


solid = part.part
